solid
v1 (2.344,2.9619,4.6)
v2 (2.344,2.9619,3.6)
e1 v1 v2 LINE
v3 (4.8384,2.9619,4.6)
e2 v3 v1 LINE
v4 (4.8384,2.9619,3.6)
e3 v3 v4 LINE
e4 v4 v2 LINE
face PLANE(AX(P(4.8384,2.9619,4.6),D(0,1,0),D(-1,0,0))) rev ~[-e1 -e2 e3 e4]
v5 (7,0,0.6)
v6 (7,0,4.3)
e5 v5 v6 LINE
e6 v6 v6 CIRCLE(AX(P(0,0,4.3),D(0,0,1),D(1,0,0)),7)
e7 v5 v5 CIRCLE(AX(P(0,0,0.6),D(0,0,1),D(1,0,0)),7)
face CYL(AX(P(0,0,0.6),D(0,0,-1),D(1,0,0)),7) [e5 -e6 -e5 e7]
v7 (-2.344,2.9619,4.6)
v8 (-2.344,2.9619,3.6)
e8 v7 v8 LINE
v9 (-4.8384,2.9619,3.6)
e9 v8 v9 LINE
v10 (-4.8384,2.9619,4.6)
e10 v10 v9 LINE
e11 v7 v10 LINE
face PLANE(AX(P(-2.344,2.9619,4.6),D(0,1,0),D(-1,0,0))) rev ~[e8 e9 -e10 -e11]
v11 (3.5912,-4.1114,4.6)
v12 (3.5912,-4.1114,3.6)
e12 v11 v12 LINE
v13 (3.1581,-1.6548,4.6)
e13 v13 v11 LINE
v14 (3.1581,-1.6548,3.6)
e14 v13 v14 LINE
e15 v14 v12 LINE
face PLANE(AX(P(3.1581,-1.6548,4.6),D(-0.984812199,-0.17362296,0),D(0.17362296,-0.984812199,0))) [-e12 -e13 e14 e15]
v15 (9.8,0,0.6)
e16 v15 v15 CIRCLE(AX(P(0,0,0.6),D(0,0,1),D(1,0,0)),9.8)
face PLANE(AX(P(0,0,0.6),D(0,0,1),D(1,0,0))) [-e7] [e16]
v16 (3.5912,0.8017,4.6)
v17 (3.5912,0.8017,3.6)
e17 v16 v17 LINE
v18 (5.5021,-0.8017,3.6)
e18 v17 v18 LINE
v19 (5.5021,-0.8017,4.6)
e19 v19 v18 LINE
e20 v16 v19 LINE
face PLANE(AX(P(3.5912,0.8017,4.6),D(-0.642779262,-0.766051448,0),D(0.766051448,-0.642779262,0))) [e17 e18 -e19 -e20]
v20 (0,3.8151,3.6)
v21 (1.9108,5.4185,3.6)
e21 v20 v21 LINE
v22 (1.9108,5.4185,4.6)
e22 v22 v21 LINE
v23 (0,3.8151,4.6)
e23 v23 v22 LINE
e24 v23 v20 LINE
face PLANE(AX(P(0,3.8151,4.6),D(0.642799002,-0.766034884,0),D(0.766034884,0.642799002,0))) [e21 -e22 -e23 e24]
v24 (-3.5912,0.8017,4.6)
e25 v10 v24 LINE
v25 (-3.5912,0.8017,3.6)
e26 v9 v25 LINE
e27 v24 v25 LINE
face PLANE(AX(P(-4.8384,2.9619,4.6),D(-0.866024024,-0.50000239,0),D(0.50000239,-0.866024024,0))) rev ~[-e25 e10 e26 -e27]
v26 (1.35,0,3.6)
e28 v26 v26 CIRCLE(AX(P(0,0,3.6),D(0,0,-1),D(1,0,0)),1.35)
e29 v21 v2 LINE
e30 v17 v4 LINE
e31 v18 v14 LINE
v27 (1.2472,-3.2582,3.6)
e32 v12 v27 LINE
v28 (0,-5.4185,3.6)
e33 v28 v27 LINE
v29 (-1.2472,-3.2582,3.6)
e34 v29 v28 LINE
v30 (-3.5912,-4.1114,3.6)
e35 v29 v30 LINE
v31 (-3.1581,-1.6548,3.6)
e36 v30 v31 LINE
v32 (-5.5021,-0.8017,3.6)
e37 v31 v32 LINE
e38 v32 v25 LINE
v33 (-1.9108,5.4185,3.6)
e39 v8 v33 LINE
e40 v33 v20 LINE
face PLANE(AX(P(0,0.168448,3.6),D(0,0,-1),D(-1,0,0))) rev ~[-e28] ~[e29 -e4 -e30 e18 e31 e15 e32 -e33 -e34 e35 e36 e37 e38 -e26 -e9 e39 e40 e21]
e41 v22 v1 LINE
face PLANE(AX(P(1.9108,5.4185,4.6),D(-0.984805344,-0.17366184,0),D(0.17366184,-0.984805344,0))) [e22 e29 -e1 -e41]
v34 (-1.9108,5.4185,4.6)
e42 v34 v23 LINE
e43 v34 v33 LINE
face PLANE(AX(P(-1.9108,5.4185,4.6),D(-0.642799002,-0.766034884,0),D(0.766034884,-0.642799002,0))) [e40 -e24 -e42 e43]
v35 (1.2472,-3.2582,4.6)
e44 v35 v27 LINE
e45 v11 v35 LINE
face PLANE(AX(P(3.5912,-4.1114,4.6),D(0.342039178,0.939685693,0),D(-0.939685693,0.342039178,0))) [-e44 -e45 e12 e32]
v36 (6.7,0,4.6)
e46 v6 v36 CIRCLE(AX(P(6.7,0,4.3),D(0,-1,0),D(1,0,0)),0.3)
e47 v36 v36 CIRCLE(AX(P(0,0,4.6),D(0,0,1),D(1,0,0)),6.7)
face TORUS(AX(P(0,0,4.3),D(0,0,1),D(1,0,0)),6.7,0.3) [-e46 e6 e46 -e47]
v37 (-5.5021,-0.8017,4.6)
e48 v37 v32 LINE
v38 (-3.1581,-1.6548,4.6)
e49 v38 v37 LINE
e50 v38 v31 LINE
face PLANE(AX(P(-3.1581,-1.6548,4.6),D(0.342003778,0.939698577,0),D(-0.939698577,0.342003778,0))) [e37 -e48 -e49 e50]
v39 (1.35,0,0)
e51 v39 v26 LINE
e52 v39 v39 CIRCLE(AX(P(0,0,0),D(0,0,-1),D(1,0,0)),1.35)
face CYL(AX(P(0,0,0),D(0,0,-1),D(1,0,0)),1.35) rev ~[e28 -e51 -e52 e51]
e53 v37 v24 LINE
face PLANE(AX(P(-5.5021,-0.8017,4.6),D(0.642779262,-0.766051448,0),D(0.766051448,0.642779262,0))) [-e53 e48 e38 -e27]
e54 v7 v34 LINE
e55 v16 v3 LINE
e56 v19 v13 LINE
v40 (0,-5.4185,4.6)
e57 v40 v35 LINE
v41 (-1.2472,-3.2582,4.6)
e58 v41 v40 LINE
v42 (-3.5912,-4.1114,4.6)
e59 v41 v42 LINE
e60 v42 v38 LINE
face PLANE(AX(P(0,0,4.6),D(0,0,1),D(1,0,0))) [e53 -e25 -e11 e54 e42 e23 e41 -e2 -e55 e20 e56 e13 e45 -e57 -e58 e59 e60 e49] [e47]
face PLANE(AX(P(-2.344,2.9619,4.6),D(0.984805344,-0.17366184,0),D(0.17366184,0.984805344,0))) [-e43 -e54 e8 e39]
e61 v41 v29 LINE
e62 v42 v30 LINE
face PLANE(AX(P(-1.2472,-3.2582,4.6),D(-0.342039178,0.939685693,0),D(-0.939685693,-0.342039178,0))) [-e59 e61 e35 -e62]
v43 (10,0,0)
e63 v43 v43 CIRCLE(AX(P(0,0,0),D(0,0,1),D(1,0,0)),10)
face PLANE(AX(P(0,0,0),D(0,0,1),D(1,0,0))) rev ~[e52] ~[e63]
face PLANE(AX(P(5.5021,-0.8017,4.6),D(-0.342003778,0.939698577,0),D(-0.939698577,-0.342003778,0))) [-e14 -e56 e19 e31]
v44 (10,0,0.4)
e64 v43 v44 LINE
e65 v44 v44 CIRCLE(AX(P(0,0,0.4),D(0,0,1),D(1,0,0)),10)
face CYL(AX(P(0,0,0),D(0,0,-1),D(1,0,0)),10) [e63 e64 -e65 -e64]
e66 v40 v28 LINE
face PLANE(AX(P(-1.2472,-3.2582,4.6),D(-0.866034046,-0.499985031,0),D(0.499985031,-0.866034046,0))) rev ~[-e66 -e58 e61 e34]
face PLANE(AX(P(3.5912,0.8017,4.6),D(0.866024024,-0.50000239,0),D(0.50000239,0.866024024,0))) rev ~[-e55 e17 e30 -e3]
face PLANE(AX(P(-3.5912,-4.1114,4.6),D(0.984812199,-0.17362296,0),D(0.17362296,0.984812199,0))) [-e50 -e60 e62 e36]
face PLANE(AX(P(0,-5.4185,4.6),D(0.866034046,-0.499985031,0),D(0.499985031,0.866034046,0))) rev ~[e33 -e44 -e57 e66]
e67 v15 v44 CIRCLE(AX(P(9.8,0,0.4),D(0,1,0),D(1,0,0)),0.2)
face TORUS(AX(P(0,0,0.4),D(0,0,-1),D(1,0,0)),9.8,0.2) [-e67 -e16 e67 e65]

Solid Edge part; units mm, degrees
sketch "Sketch1" plane through (0, 0, 0) normal (0, 0, 1) x (1, 0, 0)
  circle A0 centre (0, 0) radius 10
extrude "Protrusion1" add sketch "Sketch1" along normal blind 0.6
sketch "Sketch2" plane through (0, 0, 0.6) normal (0, 0, 1) x (1, 0, 0)
  circle A0 centre (0, 0) radius 7
extrude "ExtrudedProtrusion_2" add sketch "Sketch2" along normal blind 4
fillet "Round_1" radius 0.3 1 edges at (-7, 0, 4.6)
fillet "Round_2" radius 0.2 1 edges at (-10, 0, 0.6)
sketch "Sketch3" plane through (0, 0, 4.6) normal (0, 0, 1) x (1, 0, 0)
  line L0 (3.5912, 0.8017) -> (5.5021, -0.8017)
  line L1 (5.5021, -0.8017) -> (3.1581, -1.6548)
  line L2 (3.1581, -1.6548) -> (3.5912, -4.1114)
  line L3 (3.5912, -4.1114) -> (1.2472, -3.2582)
  line L4 (0, -5.4185) -> (1.2472, -3.2582)
  line L5 (-1.2472, -3.2582) -> (0, -5.4185)
  line L6 (-1.2472, -3.2582) -> (-3.5912, -4.1114)
  line L7 (-3.5912, -4.1114) -> (-3.1581, -1.6548)
  line L8 (-3.1581, -1.6548) -> (-5.5021, -0.8017)
  line L9 (-5.5021, -0.8017) -> (-3.5912, 0.8017)
  line L10 (-4.8384, 2.9619) -> (-3.5912, 0.8017)
  line L11 (-2.344, 2.9619) -> (-4.8384, 2.9619)
  line L12 (-2.344, 2.9619) -> (-1.9108, 5.4185)
  line L13 (-1.9108, 5.4185) -> (0, 3.8151)
  line L14 (0, 3.8151) -> (1.9108, 5.4185)
  line L15 (1.9108, 5.4185) -> (2.344, 2.9619)
  line L16 (4.8384, 2.9619) -> (2.344, 2.9619)
  line L17 (3.5912, 0.8017) -> (4.8384, 2.9619)
extrude "ExtrudedCutout_1" cut sketch "Sketch3" against normal blind 1
sketch "Sketch4" plane through (0, 0, 0) normal (0, 0, -1) x (1, 0, 0)
  circle A0 centre (0, 0) radius 1.35
extrude "ExtrudedCutout_2" cut sketch "Sketch4" against normal blind 5
